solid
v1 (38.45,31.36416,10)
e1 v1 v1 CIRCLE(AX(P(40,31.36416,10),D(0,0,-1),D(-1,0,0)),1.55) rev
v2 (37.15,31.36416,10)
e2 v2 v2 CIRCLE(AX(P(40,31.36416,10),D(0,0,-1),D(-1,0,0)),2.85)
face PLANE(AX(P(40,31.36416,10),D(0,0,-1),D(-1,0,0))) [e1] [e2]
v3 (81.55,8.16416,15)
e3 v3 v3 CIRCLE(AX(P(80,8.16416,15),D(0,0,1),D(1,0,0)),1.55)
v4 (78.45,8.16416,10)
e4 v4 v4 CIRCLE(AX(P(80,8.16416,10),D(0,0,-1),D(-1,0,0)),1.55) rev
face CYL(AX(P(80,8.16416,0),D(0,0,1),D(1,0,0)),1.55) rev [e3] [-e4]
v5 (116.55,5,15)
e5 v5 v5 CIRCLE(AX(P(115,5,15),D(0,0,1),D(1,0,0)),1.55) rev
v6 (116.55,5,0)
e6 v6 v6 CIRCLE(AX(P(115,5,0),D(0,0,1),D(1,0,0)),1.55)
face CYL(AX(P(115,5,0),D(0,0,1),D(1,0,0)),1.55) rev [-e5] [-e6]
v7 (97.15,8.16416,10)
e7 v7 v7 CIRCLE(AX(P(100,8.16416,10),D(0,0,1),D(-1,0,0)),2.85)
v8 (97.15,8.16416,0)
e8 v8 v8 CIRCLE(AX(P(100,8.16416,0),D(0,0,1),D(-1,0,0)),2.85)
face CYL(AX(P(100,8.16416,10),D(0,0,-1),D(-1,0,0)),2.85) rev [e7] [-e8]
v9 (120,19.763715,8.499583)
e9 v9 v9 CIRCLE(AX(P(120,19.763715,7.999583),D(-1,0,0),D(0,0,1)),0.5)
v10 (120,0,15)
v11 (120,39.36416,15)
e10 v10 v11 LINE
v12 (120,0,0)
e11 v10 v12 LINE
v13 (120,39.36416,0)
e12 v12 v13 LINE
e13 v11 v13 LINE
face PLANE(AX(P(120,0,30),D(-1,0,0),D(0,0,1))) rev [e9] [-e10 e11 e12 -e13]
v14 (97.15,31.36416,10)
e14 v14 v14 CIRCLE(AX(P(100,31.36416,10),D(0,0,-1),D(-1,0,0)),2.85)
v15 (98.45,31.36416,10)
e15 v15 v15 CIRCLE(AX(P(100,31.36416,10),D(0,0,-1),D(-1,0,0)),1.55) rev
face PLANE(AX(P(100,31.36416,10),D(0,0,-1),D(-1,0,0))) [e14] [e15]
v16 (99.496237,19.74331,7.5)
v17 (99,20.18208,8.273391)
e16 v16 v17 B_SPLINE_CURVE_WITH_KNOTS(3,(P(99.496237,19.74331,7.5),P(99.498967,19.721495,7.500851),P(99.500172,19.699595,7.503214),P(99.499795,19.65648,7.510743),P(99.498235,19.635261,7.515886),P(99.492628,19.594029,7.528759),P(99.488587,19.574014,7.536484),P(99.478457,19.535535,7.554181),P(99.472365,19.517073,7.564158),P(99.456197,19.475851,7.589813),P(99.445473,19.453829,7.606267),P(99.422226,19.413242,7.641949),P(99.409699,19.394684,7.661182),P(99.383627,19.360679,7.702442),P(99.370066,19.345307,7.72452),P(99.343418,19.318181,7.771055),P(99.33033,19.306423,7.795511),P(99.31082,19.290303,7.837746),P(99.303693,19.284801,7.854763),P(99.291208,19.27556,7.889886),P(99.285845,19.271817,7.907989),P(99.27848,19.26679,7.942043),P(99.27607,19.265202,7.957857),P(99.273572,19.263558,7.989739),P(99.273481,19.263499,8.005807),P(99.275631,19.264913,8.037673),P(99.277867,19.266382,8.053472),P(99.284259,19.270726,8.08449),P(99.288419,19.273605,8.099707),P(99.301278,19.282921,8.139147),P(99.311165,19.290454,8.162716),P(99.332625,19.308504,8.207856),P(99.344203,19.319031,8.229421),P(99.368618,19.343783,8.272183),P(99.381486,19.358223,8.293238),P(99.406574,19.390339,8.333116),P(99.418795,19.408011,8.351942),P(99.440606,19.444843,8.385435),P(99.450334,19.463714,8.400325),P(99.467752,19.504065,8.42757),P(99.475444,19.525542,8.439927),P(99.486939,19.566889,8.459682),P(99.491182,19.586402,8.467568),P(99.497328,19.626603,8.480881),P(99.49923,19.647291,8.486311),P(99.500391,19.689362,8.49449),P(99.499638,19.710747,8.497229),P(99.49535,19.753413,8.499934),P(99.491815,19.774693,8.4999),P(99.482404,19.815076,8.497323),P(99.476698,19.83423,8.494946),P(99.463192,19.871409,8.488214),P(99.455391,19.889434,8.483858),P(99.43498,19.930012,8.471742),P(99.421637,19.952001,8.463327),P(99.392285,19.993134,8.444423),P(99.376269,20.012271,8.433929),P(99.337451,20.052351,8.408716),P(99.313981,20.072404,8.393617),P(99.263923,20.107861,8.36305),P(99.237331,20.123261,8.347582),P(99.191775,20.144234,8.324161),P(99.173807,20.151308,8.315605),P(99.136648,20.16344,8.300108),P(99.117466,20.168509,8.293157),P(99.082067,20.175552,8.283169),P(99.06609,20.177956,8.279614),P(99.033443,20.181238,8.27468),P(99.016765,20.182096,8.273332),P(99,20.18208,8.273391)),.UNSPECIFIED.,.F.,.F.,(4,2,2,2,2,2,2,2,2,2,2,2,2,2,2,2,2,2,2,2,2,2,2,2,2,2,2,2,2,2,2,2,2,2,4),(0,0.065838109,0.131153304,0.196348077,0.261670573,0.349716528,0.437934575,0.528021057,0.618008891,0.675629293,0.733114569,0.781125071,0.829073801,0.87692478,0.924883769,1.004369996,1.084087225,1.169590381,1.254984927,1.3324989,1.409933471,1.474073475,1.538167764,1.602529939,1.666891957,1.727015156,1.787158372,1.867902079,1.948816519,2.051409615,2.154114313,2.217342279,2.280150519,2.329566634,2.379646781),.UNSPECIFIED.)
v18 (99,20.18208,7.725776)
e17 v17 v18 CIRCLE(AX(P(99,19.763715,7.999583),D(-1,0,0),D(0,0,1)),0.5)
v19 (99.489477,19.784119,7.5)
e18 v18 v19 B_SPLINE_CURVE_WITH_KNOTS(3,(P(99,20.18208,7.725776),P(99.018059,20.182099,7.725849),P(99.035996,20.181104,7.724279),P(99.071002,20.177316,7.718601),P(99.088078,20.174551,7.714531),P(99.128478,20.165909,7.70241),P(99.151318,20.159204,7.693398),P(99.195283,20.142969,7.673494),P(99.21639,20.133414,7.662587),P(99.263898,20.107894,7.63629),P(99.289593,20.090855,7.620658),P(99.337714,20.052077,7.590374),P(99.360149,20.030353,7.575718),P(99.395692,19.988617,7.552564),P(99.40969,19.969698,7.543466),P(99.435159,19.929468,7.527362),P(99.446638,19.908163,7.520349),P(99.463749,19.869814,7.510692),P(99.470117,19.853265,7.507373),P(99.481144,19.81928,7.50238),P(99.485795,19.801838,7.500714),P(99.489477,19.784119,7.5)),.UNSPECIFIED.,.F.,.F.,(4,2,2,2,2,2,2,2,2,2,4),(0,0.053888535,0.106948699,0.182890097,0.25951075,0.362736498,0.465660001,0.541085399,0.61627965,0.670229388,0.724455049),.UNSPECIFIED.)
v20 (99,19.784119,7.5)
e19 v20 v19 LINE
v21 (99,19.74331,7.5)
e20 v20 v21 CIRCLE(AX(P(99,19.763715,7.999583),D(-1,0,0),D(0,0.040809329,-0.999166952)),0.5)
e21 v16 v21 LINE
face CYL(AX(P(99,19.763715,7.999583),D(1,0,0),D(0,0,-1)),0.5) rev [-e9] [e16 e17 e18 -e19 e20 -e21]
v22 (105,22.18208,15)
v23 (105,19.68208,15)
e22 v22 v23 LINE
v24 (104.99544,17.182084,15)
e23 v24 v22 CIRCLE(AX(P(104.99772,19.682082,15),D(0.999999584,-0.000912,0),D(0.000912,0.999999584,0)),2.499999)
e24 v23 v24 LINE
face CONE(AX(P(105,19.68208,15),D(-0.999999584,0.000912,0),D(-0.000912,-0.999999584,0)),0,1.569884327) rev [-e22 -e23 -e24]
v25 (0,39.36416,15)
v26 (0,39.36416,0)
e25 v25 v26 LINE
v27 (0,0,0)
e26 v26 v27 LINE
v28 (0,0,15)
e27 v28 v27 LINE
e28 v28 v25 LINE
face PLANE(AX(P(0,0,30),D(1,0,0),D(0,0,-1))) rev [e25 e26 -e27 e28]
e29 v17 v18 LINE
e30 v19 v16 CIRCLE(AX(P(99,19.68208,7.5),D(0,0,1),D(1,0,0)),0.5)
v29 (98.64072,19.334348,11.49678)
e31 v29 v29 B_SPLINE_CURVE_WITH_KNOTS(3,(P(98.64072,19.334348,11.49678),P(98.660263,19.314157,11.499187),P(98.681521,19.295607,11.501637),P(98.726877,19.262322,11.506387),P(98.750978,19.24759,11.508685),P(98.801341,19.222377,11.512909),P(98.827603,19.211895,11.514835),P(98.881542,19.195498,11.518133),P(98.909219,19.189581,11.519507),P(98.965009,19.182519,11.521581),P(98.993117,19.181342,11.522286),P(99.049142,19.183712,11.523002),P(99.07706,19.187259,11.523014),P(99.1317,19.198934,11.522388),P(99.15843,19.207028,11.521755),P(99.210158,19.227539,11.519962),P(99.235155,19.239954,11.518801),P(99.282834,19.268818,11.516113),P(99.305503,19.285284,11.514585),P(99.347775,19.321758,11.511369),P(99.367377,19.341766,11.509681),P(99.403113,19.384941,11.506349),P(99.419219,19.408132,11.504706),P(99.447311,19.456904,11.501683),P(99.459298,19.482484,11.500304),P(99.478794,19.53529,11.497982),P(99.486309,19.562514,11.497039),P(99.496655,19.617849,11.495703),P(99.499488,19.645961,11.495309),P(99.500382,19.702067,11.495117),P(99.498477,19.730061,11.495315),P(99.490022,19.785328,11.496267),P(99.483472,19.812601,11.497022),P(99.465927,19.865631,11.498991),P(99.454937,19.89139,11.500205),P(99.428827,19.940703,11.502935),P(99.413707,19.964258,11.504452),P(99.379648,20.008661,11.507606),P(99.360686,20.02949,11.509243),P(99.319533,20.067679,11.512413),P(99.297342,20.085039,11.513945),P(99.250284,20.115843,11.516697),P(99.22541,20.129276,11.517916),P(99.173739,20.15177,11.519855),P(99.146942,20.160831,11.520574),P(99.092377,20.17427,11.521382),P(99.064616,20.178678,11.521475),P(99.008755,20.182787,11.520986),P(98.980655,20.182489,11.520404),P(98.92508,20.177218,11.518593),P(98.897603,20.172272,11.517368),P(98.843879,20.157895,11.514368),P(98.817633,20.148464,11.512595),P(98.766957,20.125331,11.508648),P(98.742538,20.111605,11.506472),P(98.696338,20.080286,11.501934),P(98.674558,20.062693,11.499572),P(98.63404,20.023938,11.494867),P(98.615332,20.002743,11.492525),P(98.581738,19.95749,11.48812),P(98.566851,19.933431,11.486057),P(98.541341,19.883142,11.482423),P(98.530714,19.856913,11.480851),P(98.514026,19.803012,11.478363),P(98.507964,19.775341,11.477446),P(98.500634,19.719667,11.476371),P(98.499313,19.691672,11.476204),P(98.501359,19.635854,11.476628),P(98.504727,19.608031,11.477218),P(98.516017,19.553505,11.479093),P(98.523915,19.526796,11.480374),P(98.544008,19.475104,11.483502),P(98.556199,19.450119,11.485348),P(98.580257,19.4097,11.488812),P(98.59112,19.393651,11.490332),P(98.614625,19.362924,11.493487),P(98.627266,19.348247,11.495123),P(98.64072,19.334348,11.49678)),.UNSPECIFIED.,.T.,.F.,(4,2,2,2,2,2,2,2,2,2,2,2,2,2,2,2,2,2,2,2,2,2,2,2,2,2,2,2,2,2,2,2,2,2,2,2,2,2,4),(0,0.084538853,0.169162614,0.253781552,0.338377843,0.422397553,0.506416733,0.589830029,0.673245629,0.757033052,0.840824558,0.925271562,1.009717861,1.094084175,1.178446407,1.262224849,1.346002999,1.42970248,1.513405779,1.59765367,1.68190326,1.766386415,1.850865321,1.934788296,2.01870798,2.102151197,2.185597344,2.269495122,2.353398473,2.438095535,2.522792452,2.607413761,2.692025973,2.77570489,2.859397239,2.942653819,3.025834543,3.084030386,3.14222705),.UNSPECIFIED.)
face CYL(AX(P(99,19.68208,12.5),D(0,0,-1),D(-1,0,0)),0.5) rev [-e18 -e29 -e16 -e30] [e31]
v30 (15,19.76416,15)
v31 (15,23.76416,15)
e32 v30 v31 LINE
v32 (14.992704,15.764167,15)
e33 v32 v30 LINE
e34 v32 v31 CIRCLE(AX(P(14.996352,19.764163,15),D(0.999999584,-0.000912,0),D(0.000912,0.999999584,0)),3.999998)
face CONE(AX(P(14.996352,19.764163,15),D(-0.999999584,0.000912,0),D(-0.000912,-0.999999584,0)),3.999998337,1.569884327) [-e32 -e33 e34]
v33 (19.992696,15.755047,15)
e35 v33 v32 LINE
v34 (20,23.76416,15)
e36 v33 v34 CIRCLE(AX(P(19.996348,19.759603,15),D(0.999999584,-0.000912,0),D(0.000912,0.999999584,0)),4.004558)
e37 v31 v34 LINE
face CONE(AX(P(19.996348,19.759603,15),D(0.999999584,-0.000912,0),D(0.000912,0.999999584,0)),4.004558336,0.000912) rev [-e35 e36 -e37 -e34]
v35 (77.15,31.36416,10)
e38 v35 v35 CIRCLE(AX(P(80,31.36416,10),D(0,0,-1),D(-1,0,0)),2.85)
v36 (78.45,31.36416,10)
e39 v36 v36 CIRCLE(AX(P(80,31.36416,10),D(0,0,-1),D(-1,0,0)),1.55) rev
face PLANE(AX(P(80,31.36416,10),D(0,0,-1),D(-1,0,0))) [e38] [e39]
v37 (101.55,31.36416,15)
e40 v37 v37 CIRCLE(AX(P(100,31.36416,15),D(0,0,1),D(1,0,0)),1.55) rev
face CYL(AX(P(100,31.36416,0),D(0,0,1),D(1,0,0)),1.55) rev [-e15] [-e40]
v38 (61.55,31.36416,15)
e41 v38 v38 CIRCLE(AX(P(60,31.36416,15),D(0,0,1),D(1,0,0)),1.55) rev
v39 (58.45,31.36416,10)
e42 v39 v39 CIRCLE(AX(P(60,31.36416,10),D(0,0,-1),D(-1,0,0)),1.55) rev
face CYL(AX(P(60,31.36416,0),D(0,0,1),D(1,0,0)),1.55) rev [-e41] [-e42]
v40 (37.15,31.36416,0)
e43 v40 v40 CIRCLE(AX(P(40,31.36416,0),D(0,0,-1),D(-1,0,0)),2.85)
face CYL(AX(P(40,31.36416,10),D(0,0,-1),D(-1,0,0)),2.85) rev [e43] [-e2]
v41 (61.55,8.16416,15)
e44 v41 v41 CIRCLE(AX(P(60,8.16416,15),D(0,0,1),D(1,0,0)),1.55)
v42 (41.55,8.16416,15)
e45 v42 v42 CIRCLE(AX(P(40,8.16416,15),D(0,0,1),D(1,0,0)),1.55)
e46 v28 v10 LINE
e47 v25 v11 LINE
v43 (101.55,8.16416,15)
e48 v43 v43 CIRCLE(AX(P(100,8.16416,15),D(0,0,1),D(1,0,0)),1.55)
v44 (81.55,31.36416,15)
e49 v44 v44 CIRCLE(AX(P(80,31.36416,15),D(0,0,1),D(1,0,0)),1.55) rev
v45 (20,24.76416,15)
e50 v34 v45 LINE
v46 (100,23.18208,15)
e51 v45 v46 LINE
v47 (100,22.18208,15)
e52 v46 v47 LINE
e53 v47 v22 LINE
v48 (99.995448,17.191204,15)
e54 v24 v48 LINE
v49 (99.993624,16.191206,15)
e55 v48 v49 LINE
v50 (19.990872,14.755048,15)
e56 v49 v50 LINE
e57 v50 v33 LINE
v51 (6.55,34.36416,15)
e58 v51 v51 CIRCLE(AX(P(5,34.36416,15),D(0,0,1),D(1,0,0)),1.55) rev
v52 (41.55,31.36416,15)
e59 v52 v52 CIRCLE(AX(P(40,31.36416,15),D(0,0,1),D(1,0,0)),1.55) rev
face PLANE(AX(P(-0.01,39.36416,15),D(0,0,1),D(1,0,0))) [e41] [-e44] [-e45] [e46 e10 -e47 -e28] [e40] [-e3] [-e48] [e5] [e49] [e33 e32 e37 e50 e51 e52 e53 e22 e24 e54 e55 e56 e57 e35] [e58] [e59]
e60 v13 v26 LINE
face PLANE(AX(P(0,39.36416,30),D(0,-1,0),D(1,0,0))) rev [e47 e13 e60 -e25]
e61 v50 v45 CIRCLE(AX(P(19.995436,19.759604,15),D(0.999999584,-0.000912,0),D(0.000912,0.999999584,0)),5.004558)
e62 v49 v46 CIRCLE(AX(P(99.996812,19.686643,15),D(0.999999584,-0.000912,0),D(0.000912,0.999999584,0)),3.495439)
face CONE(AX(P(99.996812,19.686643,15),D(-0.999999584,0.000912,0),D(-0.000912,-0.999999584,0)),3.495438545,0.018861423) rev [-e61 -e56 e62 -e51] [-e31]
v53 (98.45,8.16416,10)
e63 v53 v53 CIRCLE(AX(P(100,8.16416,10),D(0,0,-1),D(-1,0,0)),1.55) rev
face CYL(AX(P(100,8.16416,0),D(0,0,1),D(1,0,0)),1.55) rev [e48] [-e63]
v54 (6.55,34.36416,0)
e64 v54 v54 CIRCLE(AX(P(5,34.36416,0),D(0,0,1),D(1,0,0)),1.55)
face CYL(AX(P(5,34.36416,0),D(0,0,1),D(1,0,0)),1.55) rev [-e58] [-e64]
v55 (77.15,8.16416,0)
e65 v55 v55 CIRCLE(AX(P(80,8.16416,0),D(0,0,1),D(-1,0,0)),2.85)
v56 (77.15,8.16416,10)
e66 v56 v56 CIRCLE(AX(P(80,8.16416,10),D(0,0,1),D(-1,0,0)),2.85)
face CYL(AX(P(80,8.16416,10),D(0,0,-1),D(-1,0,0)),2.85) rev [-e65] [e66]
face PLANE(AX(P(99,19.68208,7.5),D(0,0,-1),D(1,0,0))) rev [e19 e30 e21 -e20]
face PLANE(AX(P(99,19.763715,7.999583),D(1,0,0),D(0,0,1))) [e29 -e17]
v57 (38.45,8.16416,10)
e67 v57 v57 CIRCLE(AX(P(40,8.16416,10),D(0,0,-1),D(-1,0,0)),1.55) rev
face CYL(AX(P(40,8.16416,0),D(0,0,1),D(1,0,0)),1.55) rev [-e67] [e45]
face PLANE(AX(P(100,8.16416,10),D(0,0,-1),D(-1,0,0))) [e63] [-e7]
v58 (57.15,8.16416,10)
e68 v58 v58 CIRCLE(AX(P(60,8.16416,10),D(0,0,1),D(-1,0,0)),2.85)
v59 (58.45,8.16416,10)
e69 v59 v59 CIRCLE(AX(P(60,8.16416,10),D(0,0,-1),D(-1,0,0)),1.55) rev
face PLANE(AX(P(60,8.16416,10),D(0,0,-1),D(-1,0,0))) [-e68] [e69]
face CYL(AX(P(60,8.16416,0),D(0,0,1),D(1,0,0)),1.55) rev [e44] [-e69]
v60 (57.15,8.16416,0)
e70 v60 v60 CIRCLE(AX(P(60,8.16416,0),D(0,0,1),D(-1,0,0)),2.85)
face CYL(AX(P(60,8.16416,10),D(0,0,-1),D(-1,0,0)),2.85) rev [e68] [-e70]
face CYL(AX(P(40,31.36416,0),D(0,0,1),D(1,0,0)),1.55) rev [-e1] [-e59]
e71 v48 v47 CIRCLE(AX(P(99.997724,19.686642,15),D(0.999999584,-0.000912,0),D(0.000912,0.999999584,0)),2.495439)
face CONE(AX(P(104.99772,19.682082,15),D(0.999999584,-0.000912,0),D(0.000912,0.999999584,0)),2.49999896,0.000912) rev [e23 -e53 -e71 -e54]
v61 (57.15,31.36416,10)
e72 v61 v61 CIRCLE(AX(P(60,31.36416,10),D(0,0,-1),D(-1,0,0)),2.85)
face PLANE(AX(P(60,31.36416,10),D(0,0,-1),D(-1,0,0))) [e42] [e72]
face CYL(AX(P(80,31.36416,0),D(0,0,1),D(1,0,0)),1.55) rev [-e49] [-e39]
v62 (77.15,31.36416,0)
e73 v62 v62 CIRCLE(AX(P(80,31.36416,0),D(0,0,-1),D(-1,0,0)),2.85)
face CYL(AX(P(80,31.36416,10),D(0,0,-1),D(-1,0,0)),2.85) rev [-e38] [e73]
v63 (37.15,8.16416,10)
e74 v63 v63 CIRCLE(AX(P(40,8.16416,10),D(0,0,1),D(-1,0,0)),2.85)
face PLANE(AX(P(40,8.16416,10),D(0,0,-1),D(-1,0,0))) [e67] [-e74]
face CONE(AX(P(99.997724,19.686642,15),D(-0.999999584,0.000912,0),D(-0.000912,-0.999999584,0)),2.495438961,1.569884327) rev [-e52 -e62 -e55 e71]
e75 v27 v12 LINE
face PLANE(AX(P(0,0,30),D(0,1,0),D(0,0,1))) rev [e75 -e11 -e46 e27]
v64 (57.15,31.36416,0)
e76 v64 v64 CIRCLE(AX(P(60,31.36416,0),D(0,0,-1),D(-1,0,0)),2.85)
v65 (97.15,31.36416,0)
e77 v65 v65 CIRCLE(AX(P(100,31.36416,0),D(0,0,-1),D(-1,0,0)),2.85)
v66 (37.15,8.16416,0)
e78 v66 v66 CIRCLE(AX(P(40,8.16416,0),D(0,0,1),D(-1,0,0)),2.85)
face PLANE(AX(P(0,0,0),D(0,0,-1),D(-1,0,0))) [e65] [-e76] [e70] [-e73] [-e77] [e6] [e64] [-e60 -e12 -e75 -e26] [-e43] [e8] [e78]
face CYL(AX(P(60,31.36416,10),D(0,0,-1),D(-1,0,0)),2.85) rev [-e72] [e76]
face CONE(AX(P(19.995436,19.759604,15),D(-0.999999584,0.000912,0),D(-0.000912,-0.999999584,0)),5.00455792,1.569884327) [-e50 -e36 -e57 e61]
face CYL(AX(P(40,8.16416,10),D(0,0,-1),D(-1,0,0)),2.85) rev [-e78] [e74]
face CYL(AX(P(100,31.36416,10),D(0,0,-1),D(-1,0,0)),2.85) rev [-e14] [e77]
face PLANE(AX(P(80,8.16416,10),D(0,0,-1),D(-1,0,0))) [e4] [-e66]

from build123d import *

# Parameters (mm, degrees)
SKIZZE2_W                        = 120
SKIZZE2_H                        = 39.364160046
AUFSATZ_LINEAR_AUSTRAGEN1_DEPTH  = 30
SKIZZE24_R                       = 1.55
SCHNITT_LINEAR_AUSTRAGEN4_DEPTH  = 130.805766806
SKIZZE46_R                       = 2.85
SCHNITT_LINEAR_AUSTRAGEN15_DEPTH = 10
SCHNITT_LINEAR_START             = -5
SCHNITT_LINEAR_AUSTRAGEN25_DEPTH = 2.7
LINEARES_MUSTER1_COUNT           = 4
LINEARES_MUSTER1_PITCH           = 20
SPIEGELN2_COPY_1_SKETCH_R        = 2.85
SPIEGELN2_COPY_1_DEPTH           = 10
SPIEGELN2_COPY_2_SKETCH_R        = 2.85
SPIEGELN2_COPY_2_DEPTH           = 10
SPIEGELN2_COPY_3_SKETCH_R        = 2.85
SPIEGELN2_COPY_3_DEPTH           = 10
SPIEGELN2_START                  = -5
SPIEGELN2_COPY_4_DEPTH           = 2.7
SPIEGELN2_COPY_5_DEPTH           = 2.7
SPIEGELN2_COPY_6_DEPTH           = 2.7
SKIZZE51_R                       = 1.55
SCHNITT_LINEAR_AUSTRAGEN26_DEPTH = 130.805766806
SKIZZE75_R                       = 0.75
SCHNITT_LINEAR_AUSTRAGEN28_DEPTH = 10
SKIZZE76_R                       = 2
SCHNITT_LINEAR_AUSTRAGEN29_DEPTH = 6
SKIZZE80_R                       = 0.5
SCHNITT_LINEAR_AUSTRAGEN34_DEPTH = 21
SCHNITT_LINEAR_START_2           = -7.5
SKIZZE81_R                       = 0.5
SCHNITT_LINEAR_AUSTRAGEN36_DEPTH = 5
ABSPALTEN3_START                 = 15
ABSPALTEN3_OUTLINE_W             = 120
ABSPALTEN3_OUTLINE_H             = 39.364160046
ABSPALTEN3_OUTLINE_R             = 1.55
ABSPALTEN3_DEPTH                 = 15


# Read off the part's stored shape, not the designer's step: Abspalten3
with BuildPart() as part:
    # Skizze2 → Aufsatz-Linear austragen1 (new body)
    with BuildSketch(Plane.XY):
        with Locations((60, 19.682080023)):
            Rectangle(SKIZZE2_W, SKIZZE2_H)
    extrude(amount=AUFSATZ_LINEAR_AUSTRAGEN1_DEPTH)

    # Skizze24 → Schnitt-Linear austragen4 (cut, through all)
    with BuildSketch(Plane.XY.offset(30)):
        with Locations((40, 31.364160046)):
            Circle(SKIZZE24_R)
        with Locations((60, 31.364160046)):
            Circle(SKIZZE24_R)
        with Locations((80, 31.364160046)):
            Circle(SKIZZE24_R)
        with Locations((100, 31.364160046)):
            Circle(SKIZZE24_R)
    schnitt_linear_austragen4 = extrude(amount=-SCHNITT_LINEAR_AUSTRAGEN4_DEPTH, mode=Mode.SUBTRACT)

    # Skizze46 → Schnitt-Linear austragen15 (cut)
    with BuildSketch(Plane(origin=(0, 0, 0), x_dir=(-1, 0, 0), z_dir=(0, 0, -1))):
        with Locations((-100, 31.364160046)):
            Circle(SKIZZE46_R)
    schnitt_linear_austragen15 = extrude(amount=-SCHNITT_LINEAR_AUSTRAGEN15_DEPTH, mode=Mode.SUBTRACT)

    # Skizze50 → Schnitt-Linear austragen25 (cut)
    with BuildSketch(Plane.XY.offset(30).offset(SCHNITT_LINEAR_START)):
        Polygon((97.15, 33.009608314), (97.15, 39.364160046), (102.85, 39.364160046), (102.85, 33.009608314), (102.85, 29.718711779), (100, 28.073263512), (97.15, 29.718711779), align=None)
    schnitt_linear_austragen25 = extrude(amount=-SCHNITT_LINEAR_AUSTRAGEN25_DEPTH, mode=Mode.SUBTRACT)

    # Lineares Muster1: Schnitt-Linear austragen15, Schnitt-Linear austragen25 ×4
    with Locations(*[(-i * LINEARES_MUSTER1_PITCH, 0, 0) for i in range(1, LINEARES_MUSTER1_COUNT)]):
        add(schnitt_linear_austragen15, mode=Mode.SUBTRACT)
        add(schnitt_linear_austragen25, mode=Mode.SUBTRACT)

    # Spiegeln2: Schnitt-Linear austragen15, Schnitt-Linear austragen25 across plane
    add(schnitt_linear_austragen15.mirror(Plane.ZX.offset(19.764160046)), mode=Mode.SUBTRACT)
    add(schnitt_linear_austragen25.mirror(Plane.ZX.offset(19.764160046)), mode=Mode.SUBTRACT)

    # Spiegeln2 copy 1 sketch → Spiegeln2 copy 1 (cut)
    with BuildSketch(Plane(origin=(-20, 39.528320093, 0), x_dir=(-1, 0, 0), z_dir=(0, 0, -1))):
        with Locations((-100, -31.364160046)):
            Circle(SPIEGELN2_COPY_1_SKETCH_R)
    extrude(amount=-SPIEGELN2_COPY_1_DEPTH, mode=Mode.SUBTRACT)

    # Spiegeln2 copy 2 sketch → Spiegeln2 copy 2 (cut)
    with BuildSketch(Plane(origin=(-40, 39.528320093, 0), x_dir=(-1, 0, 0), z_dir=(0, 0, -1))):
        with Locations((-100, -31.364160046)):
            Circle(SPIEGELN2_COPY_2_SKETCH_R)
    extrude(amount=-SPIEGELN2_COPY_2_DEPTH, mode=Mode.SUBTRACT)

    # Spiegeln2 copy 3 sketch → Spiegeln2 copy 3 (cut)
    with BuildSketch(Plane(origin=(-60, 39.528320093, 0), x_dir=(-1, 0, 0), z_dir=(0, 0, -1))):
        with Locations((-100, -31.364160046)):
            Circle(SPIEGELN2_COPY_3_SKETCH_R)
    extrude(amount=-SPIEGELN2_COPY_3_DEPTH, mode=Mode.SUBTRACT)

    # Spiegeln2 copy 4 sketch → Spiegeln2 copy 4 (cut)
    with BuildSketch(Plane(origin=(-20, 39.528320093, 30), x_dir=(1, 0, 0), z_dir=(0, 0, 1)).offset(SPIEGELN2_START)):
        Polygon((97.15, -33.009608314), (97.15, -39.364160046), (102.85, -39.364160046), (102.85, -33.009608314), (102.85, -29.718711779), (100, -28.073263512), (97.15, -29.718711779), align=None)
    extrude(amount=-SPIEGELN2_COPY_4_DEPTH, mode=Mode.SUBTRACT)

    # Spiegeln2 copy 5 sketch → Spiegeln2 copy 5 (cut)
    with BuildSketch(Plane(origin=(-40, 39.528320093, 30), x_dir=(1, 0, 0), z_dir=(0, 0, 1)).offset(SPIEGELN2_START)):
        Polygon((97.15, -33.009608314), (97.15, -39.364160046), (102.85, -39.364160046), (102.85, -33.009608314), (102.85, -29.718711779), (100, -28.073263512), (97.15, -29.718711779), align=None)
    extrude(amount=-SPIEGELN2_COPY_5_DEPTH, mode=Mode.SUBTRACT)

    # Spiegeln2 copy 6 sketch → Spiegeln2 copy 6 (cut)
    with BuildSketch(Plane(origin=(-60, 39.528320093, 30), x_dir=(1, 0, 0), z_dir=(0, 0, 1)).offset(SPIEGELN2_START)):
        Polygon((97.15, -33.009608314), (97.15, -39.364160046), (102.85, -39.364160046), (102.85, -33.009608314), (102.85, -29.718711779), (100, -28.073263512), (97.15, -29.718711779), align=None)
    extrude(amount=-SPIEGELN2_COPY_6_DEPTH, mode=Mode.SUBTRACT)

    # Spiegeln3: Schnitt-Linear austragen4 across plane
    add(schnitt_linear_austragen4.mirror(Plane.ZX.offset(19.764160046)), mode=Mode.SUBTRACT)

    # Skizze51 → Schnitt-Linear austragen26 (cut, through all)
    with BuildSketch(Plane.XY.offset(30)):
        with Locations((5, 34.364160046)):
            Circle(SKIZZE51_R)
        with Locations((115, 5)):
            Circle(SKIZZE51_R)
    extrude(amount=-SCHNITT_LINEAR_AUSTRAGEN26_DEPTH, mode=Mode.SUBTRACT)

    # Skizze73 → Schnitt-Rotation5 (revolve, cut)
    with BuildSketch(Plane.XY.offset(15)):
        Polygon((15, 19.764160046), (15, 23.764160046), (20, 23.764160046), (20, 24.764160046), (100, 23.182080023), (100, 22.182080023), (105, 22.182080023), (105, 19.682080023), align=None)
    revolve(axis=Axis((105, 19.682080023, 15), (-0.9999995841280241, 0.0009119998787298228, 0)), mode=Mode.SUBTRACT)

    # Skizze75 → Schnitt-Linear austragen28 (cut)
    with BuildSketch(Plane.XY.offset(30)):
        with Locations((21.598259807, 19.682080023)):
            Circle(SKIZZE75_R)
    extrude(amount=-SCHNITT_LINEAR_AUSTRAGEN28_DEPTH, mode=Mode.SUBTRACT)

    # Skizze76 → Schnitt-Linear austragen29 (cut)
    with BuildSketch(Plane.XY.offset(30)):
        with Locations((21.598259807, 19.682080023)):
            Circle(SKIZZE76_R)
    extrude(amount=-SCHNITT_LINEAR_AUSTRAGEN29_DEPTH, mode=Mode.SUBTRACT)

    # Skizze80 → Schnitt-Linear austragen34 (cut)
    with BuildSketch(Plane(origin=(120, 0, 0), x_dir=(0, 0, -1), z_dir=(1, 0, 0))):
        with Locations((-22.000416524, 19.763714623)):
            Circle(SKIZZE80_R)
    schnitt_linear_austragen34 = extrude(amount=-SCHNITT_LINEAR_AUSTRAGEN34_DEPTH, mode=Mode.SUBTRACT)

    # Skizze81 → Schnitt-Linear austragen36 (cut)
    with BuildSketch(Plane.XY.offset(30).offset(SCHNITT_LINEAR_START_2)):
        with Locations(Location((99, 19.682080023, 0), (0, 0, 7.034090001))):
            Circle(SKIZZE81_R)
    schnitt_linear_austragen36 = extrude(amount=-SCHNITT_LINEAR_AUSTRAGEN36_DEPTH, mode=Mode.SUBTRACT)

    # Spiegeln4: Schnitt-Linear austragen34, Schnitt-Linear austragen36 across plane
    add(schnitt_linear_austragen34.mirror(Plane.XY.offset(15)), mode=Mode.SUBTRACT)
    add(schnitt_linear_austragen36.mirror(Plane.XY.offset(15)), mode=Mode.SUBTRACT)

    # Abspalten3 outline → Abspalten3 (cut)
    with BuildSketch(Plane.XY.offset(ABSPALTEN3_START)):
        with Locations((60, 19.682080023)):
            Rectangle(ABSPALTEN3_OUTLINE_W, ABSPALTEN3_OUTLINE_H)
        with Locations((115, 5)):
            Circle(ABSPALTEN3_OUTLINE_R, mode=Mode.SUBTRACT)
        with Locations((5, 34.364160046)):
            Circle(ABSPALTEN3_OUTLINE_R, mode=Mode.SUBTRACT)
        with Locations((40, 31.364160046)):
            Circle(ABSPALTEN3_OUTLINE_R, mode=Mode.SUBTRACT)
        with Locations((60, 31.364160046)):
            Circle(ABSPALTEN3_OUTLINE_R, mode=Mode.SUBTRACT)
        with Locations((80, 31.364160046)):
            Circle(ABSPALTEN3_OUTLINE_R, mode=Mode.SUBTRACT)
        with Locations((100, 31.364160046)):
            Circle(ABSPALTEN3_OUTLINE_R, mode=Mode.SUBTRACT)
        with Locations((40, 8.164160046)):
            Circle(ABSPALTEN3_OUTLINE_R, mode=Mode.SUBTRACT)
        with Locations((60, 8.164160046)):
            Circle(ABSPALTEN3_OUTLINE_R, mode=Mode.SUBTRACT)
        with Locations((80, 8.164160046)):
            Circle(ABSPALTEN3_OUTLINE_R, mode=Mode.SUBTRACT)
        with Locations((100, 8.164160046)):
            Circle(ABSPALTEN3_OUTLINE_R, mode=Mode.SUBTRACT)
    extrude(amount=ABSPALTEN3_DEPTH, mode=Mode.SUBTRACT)


solid = part.part
